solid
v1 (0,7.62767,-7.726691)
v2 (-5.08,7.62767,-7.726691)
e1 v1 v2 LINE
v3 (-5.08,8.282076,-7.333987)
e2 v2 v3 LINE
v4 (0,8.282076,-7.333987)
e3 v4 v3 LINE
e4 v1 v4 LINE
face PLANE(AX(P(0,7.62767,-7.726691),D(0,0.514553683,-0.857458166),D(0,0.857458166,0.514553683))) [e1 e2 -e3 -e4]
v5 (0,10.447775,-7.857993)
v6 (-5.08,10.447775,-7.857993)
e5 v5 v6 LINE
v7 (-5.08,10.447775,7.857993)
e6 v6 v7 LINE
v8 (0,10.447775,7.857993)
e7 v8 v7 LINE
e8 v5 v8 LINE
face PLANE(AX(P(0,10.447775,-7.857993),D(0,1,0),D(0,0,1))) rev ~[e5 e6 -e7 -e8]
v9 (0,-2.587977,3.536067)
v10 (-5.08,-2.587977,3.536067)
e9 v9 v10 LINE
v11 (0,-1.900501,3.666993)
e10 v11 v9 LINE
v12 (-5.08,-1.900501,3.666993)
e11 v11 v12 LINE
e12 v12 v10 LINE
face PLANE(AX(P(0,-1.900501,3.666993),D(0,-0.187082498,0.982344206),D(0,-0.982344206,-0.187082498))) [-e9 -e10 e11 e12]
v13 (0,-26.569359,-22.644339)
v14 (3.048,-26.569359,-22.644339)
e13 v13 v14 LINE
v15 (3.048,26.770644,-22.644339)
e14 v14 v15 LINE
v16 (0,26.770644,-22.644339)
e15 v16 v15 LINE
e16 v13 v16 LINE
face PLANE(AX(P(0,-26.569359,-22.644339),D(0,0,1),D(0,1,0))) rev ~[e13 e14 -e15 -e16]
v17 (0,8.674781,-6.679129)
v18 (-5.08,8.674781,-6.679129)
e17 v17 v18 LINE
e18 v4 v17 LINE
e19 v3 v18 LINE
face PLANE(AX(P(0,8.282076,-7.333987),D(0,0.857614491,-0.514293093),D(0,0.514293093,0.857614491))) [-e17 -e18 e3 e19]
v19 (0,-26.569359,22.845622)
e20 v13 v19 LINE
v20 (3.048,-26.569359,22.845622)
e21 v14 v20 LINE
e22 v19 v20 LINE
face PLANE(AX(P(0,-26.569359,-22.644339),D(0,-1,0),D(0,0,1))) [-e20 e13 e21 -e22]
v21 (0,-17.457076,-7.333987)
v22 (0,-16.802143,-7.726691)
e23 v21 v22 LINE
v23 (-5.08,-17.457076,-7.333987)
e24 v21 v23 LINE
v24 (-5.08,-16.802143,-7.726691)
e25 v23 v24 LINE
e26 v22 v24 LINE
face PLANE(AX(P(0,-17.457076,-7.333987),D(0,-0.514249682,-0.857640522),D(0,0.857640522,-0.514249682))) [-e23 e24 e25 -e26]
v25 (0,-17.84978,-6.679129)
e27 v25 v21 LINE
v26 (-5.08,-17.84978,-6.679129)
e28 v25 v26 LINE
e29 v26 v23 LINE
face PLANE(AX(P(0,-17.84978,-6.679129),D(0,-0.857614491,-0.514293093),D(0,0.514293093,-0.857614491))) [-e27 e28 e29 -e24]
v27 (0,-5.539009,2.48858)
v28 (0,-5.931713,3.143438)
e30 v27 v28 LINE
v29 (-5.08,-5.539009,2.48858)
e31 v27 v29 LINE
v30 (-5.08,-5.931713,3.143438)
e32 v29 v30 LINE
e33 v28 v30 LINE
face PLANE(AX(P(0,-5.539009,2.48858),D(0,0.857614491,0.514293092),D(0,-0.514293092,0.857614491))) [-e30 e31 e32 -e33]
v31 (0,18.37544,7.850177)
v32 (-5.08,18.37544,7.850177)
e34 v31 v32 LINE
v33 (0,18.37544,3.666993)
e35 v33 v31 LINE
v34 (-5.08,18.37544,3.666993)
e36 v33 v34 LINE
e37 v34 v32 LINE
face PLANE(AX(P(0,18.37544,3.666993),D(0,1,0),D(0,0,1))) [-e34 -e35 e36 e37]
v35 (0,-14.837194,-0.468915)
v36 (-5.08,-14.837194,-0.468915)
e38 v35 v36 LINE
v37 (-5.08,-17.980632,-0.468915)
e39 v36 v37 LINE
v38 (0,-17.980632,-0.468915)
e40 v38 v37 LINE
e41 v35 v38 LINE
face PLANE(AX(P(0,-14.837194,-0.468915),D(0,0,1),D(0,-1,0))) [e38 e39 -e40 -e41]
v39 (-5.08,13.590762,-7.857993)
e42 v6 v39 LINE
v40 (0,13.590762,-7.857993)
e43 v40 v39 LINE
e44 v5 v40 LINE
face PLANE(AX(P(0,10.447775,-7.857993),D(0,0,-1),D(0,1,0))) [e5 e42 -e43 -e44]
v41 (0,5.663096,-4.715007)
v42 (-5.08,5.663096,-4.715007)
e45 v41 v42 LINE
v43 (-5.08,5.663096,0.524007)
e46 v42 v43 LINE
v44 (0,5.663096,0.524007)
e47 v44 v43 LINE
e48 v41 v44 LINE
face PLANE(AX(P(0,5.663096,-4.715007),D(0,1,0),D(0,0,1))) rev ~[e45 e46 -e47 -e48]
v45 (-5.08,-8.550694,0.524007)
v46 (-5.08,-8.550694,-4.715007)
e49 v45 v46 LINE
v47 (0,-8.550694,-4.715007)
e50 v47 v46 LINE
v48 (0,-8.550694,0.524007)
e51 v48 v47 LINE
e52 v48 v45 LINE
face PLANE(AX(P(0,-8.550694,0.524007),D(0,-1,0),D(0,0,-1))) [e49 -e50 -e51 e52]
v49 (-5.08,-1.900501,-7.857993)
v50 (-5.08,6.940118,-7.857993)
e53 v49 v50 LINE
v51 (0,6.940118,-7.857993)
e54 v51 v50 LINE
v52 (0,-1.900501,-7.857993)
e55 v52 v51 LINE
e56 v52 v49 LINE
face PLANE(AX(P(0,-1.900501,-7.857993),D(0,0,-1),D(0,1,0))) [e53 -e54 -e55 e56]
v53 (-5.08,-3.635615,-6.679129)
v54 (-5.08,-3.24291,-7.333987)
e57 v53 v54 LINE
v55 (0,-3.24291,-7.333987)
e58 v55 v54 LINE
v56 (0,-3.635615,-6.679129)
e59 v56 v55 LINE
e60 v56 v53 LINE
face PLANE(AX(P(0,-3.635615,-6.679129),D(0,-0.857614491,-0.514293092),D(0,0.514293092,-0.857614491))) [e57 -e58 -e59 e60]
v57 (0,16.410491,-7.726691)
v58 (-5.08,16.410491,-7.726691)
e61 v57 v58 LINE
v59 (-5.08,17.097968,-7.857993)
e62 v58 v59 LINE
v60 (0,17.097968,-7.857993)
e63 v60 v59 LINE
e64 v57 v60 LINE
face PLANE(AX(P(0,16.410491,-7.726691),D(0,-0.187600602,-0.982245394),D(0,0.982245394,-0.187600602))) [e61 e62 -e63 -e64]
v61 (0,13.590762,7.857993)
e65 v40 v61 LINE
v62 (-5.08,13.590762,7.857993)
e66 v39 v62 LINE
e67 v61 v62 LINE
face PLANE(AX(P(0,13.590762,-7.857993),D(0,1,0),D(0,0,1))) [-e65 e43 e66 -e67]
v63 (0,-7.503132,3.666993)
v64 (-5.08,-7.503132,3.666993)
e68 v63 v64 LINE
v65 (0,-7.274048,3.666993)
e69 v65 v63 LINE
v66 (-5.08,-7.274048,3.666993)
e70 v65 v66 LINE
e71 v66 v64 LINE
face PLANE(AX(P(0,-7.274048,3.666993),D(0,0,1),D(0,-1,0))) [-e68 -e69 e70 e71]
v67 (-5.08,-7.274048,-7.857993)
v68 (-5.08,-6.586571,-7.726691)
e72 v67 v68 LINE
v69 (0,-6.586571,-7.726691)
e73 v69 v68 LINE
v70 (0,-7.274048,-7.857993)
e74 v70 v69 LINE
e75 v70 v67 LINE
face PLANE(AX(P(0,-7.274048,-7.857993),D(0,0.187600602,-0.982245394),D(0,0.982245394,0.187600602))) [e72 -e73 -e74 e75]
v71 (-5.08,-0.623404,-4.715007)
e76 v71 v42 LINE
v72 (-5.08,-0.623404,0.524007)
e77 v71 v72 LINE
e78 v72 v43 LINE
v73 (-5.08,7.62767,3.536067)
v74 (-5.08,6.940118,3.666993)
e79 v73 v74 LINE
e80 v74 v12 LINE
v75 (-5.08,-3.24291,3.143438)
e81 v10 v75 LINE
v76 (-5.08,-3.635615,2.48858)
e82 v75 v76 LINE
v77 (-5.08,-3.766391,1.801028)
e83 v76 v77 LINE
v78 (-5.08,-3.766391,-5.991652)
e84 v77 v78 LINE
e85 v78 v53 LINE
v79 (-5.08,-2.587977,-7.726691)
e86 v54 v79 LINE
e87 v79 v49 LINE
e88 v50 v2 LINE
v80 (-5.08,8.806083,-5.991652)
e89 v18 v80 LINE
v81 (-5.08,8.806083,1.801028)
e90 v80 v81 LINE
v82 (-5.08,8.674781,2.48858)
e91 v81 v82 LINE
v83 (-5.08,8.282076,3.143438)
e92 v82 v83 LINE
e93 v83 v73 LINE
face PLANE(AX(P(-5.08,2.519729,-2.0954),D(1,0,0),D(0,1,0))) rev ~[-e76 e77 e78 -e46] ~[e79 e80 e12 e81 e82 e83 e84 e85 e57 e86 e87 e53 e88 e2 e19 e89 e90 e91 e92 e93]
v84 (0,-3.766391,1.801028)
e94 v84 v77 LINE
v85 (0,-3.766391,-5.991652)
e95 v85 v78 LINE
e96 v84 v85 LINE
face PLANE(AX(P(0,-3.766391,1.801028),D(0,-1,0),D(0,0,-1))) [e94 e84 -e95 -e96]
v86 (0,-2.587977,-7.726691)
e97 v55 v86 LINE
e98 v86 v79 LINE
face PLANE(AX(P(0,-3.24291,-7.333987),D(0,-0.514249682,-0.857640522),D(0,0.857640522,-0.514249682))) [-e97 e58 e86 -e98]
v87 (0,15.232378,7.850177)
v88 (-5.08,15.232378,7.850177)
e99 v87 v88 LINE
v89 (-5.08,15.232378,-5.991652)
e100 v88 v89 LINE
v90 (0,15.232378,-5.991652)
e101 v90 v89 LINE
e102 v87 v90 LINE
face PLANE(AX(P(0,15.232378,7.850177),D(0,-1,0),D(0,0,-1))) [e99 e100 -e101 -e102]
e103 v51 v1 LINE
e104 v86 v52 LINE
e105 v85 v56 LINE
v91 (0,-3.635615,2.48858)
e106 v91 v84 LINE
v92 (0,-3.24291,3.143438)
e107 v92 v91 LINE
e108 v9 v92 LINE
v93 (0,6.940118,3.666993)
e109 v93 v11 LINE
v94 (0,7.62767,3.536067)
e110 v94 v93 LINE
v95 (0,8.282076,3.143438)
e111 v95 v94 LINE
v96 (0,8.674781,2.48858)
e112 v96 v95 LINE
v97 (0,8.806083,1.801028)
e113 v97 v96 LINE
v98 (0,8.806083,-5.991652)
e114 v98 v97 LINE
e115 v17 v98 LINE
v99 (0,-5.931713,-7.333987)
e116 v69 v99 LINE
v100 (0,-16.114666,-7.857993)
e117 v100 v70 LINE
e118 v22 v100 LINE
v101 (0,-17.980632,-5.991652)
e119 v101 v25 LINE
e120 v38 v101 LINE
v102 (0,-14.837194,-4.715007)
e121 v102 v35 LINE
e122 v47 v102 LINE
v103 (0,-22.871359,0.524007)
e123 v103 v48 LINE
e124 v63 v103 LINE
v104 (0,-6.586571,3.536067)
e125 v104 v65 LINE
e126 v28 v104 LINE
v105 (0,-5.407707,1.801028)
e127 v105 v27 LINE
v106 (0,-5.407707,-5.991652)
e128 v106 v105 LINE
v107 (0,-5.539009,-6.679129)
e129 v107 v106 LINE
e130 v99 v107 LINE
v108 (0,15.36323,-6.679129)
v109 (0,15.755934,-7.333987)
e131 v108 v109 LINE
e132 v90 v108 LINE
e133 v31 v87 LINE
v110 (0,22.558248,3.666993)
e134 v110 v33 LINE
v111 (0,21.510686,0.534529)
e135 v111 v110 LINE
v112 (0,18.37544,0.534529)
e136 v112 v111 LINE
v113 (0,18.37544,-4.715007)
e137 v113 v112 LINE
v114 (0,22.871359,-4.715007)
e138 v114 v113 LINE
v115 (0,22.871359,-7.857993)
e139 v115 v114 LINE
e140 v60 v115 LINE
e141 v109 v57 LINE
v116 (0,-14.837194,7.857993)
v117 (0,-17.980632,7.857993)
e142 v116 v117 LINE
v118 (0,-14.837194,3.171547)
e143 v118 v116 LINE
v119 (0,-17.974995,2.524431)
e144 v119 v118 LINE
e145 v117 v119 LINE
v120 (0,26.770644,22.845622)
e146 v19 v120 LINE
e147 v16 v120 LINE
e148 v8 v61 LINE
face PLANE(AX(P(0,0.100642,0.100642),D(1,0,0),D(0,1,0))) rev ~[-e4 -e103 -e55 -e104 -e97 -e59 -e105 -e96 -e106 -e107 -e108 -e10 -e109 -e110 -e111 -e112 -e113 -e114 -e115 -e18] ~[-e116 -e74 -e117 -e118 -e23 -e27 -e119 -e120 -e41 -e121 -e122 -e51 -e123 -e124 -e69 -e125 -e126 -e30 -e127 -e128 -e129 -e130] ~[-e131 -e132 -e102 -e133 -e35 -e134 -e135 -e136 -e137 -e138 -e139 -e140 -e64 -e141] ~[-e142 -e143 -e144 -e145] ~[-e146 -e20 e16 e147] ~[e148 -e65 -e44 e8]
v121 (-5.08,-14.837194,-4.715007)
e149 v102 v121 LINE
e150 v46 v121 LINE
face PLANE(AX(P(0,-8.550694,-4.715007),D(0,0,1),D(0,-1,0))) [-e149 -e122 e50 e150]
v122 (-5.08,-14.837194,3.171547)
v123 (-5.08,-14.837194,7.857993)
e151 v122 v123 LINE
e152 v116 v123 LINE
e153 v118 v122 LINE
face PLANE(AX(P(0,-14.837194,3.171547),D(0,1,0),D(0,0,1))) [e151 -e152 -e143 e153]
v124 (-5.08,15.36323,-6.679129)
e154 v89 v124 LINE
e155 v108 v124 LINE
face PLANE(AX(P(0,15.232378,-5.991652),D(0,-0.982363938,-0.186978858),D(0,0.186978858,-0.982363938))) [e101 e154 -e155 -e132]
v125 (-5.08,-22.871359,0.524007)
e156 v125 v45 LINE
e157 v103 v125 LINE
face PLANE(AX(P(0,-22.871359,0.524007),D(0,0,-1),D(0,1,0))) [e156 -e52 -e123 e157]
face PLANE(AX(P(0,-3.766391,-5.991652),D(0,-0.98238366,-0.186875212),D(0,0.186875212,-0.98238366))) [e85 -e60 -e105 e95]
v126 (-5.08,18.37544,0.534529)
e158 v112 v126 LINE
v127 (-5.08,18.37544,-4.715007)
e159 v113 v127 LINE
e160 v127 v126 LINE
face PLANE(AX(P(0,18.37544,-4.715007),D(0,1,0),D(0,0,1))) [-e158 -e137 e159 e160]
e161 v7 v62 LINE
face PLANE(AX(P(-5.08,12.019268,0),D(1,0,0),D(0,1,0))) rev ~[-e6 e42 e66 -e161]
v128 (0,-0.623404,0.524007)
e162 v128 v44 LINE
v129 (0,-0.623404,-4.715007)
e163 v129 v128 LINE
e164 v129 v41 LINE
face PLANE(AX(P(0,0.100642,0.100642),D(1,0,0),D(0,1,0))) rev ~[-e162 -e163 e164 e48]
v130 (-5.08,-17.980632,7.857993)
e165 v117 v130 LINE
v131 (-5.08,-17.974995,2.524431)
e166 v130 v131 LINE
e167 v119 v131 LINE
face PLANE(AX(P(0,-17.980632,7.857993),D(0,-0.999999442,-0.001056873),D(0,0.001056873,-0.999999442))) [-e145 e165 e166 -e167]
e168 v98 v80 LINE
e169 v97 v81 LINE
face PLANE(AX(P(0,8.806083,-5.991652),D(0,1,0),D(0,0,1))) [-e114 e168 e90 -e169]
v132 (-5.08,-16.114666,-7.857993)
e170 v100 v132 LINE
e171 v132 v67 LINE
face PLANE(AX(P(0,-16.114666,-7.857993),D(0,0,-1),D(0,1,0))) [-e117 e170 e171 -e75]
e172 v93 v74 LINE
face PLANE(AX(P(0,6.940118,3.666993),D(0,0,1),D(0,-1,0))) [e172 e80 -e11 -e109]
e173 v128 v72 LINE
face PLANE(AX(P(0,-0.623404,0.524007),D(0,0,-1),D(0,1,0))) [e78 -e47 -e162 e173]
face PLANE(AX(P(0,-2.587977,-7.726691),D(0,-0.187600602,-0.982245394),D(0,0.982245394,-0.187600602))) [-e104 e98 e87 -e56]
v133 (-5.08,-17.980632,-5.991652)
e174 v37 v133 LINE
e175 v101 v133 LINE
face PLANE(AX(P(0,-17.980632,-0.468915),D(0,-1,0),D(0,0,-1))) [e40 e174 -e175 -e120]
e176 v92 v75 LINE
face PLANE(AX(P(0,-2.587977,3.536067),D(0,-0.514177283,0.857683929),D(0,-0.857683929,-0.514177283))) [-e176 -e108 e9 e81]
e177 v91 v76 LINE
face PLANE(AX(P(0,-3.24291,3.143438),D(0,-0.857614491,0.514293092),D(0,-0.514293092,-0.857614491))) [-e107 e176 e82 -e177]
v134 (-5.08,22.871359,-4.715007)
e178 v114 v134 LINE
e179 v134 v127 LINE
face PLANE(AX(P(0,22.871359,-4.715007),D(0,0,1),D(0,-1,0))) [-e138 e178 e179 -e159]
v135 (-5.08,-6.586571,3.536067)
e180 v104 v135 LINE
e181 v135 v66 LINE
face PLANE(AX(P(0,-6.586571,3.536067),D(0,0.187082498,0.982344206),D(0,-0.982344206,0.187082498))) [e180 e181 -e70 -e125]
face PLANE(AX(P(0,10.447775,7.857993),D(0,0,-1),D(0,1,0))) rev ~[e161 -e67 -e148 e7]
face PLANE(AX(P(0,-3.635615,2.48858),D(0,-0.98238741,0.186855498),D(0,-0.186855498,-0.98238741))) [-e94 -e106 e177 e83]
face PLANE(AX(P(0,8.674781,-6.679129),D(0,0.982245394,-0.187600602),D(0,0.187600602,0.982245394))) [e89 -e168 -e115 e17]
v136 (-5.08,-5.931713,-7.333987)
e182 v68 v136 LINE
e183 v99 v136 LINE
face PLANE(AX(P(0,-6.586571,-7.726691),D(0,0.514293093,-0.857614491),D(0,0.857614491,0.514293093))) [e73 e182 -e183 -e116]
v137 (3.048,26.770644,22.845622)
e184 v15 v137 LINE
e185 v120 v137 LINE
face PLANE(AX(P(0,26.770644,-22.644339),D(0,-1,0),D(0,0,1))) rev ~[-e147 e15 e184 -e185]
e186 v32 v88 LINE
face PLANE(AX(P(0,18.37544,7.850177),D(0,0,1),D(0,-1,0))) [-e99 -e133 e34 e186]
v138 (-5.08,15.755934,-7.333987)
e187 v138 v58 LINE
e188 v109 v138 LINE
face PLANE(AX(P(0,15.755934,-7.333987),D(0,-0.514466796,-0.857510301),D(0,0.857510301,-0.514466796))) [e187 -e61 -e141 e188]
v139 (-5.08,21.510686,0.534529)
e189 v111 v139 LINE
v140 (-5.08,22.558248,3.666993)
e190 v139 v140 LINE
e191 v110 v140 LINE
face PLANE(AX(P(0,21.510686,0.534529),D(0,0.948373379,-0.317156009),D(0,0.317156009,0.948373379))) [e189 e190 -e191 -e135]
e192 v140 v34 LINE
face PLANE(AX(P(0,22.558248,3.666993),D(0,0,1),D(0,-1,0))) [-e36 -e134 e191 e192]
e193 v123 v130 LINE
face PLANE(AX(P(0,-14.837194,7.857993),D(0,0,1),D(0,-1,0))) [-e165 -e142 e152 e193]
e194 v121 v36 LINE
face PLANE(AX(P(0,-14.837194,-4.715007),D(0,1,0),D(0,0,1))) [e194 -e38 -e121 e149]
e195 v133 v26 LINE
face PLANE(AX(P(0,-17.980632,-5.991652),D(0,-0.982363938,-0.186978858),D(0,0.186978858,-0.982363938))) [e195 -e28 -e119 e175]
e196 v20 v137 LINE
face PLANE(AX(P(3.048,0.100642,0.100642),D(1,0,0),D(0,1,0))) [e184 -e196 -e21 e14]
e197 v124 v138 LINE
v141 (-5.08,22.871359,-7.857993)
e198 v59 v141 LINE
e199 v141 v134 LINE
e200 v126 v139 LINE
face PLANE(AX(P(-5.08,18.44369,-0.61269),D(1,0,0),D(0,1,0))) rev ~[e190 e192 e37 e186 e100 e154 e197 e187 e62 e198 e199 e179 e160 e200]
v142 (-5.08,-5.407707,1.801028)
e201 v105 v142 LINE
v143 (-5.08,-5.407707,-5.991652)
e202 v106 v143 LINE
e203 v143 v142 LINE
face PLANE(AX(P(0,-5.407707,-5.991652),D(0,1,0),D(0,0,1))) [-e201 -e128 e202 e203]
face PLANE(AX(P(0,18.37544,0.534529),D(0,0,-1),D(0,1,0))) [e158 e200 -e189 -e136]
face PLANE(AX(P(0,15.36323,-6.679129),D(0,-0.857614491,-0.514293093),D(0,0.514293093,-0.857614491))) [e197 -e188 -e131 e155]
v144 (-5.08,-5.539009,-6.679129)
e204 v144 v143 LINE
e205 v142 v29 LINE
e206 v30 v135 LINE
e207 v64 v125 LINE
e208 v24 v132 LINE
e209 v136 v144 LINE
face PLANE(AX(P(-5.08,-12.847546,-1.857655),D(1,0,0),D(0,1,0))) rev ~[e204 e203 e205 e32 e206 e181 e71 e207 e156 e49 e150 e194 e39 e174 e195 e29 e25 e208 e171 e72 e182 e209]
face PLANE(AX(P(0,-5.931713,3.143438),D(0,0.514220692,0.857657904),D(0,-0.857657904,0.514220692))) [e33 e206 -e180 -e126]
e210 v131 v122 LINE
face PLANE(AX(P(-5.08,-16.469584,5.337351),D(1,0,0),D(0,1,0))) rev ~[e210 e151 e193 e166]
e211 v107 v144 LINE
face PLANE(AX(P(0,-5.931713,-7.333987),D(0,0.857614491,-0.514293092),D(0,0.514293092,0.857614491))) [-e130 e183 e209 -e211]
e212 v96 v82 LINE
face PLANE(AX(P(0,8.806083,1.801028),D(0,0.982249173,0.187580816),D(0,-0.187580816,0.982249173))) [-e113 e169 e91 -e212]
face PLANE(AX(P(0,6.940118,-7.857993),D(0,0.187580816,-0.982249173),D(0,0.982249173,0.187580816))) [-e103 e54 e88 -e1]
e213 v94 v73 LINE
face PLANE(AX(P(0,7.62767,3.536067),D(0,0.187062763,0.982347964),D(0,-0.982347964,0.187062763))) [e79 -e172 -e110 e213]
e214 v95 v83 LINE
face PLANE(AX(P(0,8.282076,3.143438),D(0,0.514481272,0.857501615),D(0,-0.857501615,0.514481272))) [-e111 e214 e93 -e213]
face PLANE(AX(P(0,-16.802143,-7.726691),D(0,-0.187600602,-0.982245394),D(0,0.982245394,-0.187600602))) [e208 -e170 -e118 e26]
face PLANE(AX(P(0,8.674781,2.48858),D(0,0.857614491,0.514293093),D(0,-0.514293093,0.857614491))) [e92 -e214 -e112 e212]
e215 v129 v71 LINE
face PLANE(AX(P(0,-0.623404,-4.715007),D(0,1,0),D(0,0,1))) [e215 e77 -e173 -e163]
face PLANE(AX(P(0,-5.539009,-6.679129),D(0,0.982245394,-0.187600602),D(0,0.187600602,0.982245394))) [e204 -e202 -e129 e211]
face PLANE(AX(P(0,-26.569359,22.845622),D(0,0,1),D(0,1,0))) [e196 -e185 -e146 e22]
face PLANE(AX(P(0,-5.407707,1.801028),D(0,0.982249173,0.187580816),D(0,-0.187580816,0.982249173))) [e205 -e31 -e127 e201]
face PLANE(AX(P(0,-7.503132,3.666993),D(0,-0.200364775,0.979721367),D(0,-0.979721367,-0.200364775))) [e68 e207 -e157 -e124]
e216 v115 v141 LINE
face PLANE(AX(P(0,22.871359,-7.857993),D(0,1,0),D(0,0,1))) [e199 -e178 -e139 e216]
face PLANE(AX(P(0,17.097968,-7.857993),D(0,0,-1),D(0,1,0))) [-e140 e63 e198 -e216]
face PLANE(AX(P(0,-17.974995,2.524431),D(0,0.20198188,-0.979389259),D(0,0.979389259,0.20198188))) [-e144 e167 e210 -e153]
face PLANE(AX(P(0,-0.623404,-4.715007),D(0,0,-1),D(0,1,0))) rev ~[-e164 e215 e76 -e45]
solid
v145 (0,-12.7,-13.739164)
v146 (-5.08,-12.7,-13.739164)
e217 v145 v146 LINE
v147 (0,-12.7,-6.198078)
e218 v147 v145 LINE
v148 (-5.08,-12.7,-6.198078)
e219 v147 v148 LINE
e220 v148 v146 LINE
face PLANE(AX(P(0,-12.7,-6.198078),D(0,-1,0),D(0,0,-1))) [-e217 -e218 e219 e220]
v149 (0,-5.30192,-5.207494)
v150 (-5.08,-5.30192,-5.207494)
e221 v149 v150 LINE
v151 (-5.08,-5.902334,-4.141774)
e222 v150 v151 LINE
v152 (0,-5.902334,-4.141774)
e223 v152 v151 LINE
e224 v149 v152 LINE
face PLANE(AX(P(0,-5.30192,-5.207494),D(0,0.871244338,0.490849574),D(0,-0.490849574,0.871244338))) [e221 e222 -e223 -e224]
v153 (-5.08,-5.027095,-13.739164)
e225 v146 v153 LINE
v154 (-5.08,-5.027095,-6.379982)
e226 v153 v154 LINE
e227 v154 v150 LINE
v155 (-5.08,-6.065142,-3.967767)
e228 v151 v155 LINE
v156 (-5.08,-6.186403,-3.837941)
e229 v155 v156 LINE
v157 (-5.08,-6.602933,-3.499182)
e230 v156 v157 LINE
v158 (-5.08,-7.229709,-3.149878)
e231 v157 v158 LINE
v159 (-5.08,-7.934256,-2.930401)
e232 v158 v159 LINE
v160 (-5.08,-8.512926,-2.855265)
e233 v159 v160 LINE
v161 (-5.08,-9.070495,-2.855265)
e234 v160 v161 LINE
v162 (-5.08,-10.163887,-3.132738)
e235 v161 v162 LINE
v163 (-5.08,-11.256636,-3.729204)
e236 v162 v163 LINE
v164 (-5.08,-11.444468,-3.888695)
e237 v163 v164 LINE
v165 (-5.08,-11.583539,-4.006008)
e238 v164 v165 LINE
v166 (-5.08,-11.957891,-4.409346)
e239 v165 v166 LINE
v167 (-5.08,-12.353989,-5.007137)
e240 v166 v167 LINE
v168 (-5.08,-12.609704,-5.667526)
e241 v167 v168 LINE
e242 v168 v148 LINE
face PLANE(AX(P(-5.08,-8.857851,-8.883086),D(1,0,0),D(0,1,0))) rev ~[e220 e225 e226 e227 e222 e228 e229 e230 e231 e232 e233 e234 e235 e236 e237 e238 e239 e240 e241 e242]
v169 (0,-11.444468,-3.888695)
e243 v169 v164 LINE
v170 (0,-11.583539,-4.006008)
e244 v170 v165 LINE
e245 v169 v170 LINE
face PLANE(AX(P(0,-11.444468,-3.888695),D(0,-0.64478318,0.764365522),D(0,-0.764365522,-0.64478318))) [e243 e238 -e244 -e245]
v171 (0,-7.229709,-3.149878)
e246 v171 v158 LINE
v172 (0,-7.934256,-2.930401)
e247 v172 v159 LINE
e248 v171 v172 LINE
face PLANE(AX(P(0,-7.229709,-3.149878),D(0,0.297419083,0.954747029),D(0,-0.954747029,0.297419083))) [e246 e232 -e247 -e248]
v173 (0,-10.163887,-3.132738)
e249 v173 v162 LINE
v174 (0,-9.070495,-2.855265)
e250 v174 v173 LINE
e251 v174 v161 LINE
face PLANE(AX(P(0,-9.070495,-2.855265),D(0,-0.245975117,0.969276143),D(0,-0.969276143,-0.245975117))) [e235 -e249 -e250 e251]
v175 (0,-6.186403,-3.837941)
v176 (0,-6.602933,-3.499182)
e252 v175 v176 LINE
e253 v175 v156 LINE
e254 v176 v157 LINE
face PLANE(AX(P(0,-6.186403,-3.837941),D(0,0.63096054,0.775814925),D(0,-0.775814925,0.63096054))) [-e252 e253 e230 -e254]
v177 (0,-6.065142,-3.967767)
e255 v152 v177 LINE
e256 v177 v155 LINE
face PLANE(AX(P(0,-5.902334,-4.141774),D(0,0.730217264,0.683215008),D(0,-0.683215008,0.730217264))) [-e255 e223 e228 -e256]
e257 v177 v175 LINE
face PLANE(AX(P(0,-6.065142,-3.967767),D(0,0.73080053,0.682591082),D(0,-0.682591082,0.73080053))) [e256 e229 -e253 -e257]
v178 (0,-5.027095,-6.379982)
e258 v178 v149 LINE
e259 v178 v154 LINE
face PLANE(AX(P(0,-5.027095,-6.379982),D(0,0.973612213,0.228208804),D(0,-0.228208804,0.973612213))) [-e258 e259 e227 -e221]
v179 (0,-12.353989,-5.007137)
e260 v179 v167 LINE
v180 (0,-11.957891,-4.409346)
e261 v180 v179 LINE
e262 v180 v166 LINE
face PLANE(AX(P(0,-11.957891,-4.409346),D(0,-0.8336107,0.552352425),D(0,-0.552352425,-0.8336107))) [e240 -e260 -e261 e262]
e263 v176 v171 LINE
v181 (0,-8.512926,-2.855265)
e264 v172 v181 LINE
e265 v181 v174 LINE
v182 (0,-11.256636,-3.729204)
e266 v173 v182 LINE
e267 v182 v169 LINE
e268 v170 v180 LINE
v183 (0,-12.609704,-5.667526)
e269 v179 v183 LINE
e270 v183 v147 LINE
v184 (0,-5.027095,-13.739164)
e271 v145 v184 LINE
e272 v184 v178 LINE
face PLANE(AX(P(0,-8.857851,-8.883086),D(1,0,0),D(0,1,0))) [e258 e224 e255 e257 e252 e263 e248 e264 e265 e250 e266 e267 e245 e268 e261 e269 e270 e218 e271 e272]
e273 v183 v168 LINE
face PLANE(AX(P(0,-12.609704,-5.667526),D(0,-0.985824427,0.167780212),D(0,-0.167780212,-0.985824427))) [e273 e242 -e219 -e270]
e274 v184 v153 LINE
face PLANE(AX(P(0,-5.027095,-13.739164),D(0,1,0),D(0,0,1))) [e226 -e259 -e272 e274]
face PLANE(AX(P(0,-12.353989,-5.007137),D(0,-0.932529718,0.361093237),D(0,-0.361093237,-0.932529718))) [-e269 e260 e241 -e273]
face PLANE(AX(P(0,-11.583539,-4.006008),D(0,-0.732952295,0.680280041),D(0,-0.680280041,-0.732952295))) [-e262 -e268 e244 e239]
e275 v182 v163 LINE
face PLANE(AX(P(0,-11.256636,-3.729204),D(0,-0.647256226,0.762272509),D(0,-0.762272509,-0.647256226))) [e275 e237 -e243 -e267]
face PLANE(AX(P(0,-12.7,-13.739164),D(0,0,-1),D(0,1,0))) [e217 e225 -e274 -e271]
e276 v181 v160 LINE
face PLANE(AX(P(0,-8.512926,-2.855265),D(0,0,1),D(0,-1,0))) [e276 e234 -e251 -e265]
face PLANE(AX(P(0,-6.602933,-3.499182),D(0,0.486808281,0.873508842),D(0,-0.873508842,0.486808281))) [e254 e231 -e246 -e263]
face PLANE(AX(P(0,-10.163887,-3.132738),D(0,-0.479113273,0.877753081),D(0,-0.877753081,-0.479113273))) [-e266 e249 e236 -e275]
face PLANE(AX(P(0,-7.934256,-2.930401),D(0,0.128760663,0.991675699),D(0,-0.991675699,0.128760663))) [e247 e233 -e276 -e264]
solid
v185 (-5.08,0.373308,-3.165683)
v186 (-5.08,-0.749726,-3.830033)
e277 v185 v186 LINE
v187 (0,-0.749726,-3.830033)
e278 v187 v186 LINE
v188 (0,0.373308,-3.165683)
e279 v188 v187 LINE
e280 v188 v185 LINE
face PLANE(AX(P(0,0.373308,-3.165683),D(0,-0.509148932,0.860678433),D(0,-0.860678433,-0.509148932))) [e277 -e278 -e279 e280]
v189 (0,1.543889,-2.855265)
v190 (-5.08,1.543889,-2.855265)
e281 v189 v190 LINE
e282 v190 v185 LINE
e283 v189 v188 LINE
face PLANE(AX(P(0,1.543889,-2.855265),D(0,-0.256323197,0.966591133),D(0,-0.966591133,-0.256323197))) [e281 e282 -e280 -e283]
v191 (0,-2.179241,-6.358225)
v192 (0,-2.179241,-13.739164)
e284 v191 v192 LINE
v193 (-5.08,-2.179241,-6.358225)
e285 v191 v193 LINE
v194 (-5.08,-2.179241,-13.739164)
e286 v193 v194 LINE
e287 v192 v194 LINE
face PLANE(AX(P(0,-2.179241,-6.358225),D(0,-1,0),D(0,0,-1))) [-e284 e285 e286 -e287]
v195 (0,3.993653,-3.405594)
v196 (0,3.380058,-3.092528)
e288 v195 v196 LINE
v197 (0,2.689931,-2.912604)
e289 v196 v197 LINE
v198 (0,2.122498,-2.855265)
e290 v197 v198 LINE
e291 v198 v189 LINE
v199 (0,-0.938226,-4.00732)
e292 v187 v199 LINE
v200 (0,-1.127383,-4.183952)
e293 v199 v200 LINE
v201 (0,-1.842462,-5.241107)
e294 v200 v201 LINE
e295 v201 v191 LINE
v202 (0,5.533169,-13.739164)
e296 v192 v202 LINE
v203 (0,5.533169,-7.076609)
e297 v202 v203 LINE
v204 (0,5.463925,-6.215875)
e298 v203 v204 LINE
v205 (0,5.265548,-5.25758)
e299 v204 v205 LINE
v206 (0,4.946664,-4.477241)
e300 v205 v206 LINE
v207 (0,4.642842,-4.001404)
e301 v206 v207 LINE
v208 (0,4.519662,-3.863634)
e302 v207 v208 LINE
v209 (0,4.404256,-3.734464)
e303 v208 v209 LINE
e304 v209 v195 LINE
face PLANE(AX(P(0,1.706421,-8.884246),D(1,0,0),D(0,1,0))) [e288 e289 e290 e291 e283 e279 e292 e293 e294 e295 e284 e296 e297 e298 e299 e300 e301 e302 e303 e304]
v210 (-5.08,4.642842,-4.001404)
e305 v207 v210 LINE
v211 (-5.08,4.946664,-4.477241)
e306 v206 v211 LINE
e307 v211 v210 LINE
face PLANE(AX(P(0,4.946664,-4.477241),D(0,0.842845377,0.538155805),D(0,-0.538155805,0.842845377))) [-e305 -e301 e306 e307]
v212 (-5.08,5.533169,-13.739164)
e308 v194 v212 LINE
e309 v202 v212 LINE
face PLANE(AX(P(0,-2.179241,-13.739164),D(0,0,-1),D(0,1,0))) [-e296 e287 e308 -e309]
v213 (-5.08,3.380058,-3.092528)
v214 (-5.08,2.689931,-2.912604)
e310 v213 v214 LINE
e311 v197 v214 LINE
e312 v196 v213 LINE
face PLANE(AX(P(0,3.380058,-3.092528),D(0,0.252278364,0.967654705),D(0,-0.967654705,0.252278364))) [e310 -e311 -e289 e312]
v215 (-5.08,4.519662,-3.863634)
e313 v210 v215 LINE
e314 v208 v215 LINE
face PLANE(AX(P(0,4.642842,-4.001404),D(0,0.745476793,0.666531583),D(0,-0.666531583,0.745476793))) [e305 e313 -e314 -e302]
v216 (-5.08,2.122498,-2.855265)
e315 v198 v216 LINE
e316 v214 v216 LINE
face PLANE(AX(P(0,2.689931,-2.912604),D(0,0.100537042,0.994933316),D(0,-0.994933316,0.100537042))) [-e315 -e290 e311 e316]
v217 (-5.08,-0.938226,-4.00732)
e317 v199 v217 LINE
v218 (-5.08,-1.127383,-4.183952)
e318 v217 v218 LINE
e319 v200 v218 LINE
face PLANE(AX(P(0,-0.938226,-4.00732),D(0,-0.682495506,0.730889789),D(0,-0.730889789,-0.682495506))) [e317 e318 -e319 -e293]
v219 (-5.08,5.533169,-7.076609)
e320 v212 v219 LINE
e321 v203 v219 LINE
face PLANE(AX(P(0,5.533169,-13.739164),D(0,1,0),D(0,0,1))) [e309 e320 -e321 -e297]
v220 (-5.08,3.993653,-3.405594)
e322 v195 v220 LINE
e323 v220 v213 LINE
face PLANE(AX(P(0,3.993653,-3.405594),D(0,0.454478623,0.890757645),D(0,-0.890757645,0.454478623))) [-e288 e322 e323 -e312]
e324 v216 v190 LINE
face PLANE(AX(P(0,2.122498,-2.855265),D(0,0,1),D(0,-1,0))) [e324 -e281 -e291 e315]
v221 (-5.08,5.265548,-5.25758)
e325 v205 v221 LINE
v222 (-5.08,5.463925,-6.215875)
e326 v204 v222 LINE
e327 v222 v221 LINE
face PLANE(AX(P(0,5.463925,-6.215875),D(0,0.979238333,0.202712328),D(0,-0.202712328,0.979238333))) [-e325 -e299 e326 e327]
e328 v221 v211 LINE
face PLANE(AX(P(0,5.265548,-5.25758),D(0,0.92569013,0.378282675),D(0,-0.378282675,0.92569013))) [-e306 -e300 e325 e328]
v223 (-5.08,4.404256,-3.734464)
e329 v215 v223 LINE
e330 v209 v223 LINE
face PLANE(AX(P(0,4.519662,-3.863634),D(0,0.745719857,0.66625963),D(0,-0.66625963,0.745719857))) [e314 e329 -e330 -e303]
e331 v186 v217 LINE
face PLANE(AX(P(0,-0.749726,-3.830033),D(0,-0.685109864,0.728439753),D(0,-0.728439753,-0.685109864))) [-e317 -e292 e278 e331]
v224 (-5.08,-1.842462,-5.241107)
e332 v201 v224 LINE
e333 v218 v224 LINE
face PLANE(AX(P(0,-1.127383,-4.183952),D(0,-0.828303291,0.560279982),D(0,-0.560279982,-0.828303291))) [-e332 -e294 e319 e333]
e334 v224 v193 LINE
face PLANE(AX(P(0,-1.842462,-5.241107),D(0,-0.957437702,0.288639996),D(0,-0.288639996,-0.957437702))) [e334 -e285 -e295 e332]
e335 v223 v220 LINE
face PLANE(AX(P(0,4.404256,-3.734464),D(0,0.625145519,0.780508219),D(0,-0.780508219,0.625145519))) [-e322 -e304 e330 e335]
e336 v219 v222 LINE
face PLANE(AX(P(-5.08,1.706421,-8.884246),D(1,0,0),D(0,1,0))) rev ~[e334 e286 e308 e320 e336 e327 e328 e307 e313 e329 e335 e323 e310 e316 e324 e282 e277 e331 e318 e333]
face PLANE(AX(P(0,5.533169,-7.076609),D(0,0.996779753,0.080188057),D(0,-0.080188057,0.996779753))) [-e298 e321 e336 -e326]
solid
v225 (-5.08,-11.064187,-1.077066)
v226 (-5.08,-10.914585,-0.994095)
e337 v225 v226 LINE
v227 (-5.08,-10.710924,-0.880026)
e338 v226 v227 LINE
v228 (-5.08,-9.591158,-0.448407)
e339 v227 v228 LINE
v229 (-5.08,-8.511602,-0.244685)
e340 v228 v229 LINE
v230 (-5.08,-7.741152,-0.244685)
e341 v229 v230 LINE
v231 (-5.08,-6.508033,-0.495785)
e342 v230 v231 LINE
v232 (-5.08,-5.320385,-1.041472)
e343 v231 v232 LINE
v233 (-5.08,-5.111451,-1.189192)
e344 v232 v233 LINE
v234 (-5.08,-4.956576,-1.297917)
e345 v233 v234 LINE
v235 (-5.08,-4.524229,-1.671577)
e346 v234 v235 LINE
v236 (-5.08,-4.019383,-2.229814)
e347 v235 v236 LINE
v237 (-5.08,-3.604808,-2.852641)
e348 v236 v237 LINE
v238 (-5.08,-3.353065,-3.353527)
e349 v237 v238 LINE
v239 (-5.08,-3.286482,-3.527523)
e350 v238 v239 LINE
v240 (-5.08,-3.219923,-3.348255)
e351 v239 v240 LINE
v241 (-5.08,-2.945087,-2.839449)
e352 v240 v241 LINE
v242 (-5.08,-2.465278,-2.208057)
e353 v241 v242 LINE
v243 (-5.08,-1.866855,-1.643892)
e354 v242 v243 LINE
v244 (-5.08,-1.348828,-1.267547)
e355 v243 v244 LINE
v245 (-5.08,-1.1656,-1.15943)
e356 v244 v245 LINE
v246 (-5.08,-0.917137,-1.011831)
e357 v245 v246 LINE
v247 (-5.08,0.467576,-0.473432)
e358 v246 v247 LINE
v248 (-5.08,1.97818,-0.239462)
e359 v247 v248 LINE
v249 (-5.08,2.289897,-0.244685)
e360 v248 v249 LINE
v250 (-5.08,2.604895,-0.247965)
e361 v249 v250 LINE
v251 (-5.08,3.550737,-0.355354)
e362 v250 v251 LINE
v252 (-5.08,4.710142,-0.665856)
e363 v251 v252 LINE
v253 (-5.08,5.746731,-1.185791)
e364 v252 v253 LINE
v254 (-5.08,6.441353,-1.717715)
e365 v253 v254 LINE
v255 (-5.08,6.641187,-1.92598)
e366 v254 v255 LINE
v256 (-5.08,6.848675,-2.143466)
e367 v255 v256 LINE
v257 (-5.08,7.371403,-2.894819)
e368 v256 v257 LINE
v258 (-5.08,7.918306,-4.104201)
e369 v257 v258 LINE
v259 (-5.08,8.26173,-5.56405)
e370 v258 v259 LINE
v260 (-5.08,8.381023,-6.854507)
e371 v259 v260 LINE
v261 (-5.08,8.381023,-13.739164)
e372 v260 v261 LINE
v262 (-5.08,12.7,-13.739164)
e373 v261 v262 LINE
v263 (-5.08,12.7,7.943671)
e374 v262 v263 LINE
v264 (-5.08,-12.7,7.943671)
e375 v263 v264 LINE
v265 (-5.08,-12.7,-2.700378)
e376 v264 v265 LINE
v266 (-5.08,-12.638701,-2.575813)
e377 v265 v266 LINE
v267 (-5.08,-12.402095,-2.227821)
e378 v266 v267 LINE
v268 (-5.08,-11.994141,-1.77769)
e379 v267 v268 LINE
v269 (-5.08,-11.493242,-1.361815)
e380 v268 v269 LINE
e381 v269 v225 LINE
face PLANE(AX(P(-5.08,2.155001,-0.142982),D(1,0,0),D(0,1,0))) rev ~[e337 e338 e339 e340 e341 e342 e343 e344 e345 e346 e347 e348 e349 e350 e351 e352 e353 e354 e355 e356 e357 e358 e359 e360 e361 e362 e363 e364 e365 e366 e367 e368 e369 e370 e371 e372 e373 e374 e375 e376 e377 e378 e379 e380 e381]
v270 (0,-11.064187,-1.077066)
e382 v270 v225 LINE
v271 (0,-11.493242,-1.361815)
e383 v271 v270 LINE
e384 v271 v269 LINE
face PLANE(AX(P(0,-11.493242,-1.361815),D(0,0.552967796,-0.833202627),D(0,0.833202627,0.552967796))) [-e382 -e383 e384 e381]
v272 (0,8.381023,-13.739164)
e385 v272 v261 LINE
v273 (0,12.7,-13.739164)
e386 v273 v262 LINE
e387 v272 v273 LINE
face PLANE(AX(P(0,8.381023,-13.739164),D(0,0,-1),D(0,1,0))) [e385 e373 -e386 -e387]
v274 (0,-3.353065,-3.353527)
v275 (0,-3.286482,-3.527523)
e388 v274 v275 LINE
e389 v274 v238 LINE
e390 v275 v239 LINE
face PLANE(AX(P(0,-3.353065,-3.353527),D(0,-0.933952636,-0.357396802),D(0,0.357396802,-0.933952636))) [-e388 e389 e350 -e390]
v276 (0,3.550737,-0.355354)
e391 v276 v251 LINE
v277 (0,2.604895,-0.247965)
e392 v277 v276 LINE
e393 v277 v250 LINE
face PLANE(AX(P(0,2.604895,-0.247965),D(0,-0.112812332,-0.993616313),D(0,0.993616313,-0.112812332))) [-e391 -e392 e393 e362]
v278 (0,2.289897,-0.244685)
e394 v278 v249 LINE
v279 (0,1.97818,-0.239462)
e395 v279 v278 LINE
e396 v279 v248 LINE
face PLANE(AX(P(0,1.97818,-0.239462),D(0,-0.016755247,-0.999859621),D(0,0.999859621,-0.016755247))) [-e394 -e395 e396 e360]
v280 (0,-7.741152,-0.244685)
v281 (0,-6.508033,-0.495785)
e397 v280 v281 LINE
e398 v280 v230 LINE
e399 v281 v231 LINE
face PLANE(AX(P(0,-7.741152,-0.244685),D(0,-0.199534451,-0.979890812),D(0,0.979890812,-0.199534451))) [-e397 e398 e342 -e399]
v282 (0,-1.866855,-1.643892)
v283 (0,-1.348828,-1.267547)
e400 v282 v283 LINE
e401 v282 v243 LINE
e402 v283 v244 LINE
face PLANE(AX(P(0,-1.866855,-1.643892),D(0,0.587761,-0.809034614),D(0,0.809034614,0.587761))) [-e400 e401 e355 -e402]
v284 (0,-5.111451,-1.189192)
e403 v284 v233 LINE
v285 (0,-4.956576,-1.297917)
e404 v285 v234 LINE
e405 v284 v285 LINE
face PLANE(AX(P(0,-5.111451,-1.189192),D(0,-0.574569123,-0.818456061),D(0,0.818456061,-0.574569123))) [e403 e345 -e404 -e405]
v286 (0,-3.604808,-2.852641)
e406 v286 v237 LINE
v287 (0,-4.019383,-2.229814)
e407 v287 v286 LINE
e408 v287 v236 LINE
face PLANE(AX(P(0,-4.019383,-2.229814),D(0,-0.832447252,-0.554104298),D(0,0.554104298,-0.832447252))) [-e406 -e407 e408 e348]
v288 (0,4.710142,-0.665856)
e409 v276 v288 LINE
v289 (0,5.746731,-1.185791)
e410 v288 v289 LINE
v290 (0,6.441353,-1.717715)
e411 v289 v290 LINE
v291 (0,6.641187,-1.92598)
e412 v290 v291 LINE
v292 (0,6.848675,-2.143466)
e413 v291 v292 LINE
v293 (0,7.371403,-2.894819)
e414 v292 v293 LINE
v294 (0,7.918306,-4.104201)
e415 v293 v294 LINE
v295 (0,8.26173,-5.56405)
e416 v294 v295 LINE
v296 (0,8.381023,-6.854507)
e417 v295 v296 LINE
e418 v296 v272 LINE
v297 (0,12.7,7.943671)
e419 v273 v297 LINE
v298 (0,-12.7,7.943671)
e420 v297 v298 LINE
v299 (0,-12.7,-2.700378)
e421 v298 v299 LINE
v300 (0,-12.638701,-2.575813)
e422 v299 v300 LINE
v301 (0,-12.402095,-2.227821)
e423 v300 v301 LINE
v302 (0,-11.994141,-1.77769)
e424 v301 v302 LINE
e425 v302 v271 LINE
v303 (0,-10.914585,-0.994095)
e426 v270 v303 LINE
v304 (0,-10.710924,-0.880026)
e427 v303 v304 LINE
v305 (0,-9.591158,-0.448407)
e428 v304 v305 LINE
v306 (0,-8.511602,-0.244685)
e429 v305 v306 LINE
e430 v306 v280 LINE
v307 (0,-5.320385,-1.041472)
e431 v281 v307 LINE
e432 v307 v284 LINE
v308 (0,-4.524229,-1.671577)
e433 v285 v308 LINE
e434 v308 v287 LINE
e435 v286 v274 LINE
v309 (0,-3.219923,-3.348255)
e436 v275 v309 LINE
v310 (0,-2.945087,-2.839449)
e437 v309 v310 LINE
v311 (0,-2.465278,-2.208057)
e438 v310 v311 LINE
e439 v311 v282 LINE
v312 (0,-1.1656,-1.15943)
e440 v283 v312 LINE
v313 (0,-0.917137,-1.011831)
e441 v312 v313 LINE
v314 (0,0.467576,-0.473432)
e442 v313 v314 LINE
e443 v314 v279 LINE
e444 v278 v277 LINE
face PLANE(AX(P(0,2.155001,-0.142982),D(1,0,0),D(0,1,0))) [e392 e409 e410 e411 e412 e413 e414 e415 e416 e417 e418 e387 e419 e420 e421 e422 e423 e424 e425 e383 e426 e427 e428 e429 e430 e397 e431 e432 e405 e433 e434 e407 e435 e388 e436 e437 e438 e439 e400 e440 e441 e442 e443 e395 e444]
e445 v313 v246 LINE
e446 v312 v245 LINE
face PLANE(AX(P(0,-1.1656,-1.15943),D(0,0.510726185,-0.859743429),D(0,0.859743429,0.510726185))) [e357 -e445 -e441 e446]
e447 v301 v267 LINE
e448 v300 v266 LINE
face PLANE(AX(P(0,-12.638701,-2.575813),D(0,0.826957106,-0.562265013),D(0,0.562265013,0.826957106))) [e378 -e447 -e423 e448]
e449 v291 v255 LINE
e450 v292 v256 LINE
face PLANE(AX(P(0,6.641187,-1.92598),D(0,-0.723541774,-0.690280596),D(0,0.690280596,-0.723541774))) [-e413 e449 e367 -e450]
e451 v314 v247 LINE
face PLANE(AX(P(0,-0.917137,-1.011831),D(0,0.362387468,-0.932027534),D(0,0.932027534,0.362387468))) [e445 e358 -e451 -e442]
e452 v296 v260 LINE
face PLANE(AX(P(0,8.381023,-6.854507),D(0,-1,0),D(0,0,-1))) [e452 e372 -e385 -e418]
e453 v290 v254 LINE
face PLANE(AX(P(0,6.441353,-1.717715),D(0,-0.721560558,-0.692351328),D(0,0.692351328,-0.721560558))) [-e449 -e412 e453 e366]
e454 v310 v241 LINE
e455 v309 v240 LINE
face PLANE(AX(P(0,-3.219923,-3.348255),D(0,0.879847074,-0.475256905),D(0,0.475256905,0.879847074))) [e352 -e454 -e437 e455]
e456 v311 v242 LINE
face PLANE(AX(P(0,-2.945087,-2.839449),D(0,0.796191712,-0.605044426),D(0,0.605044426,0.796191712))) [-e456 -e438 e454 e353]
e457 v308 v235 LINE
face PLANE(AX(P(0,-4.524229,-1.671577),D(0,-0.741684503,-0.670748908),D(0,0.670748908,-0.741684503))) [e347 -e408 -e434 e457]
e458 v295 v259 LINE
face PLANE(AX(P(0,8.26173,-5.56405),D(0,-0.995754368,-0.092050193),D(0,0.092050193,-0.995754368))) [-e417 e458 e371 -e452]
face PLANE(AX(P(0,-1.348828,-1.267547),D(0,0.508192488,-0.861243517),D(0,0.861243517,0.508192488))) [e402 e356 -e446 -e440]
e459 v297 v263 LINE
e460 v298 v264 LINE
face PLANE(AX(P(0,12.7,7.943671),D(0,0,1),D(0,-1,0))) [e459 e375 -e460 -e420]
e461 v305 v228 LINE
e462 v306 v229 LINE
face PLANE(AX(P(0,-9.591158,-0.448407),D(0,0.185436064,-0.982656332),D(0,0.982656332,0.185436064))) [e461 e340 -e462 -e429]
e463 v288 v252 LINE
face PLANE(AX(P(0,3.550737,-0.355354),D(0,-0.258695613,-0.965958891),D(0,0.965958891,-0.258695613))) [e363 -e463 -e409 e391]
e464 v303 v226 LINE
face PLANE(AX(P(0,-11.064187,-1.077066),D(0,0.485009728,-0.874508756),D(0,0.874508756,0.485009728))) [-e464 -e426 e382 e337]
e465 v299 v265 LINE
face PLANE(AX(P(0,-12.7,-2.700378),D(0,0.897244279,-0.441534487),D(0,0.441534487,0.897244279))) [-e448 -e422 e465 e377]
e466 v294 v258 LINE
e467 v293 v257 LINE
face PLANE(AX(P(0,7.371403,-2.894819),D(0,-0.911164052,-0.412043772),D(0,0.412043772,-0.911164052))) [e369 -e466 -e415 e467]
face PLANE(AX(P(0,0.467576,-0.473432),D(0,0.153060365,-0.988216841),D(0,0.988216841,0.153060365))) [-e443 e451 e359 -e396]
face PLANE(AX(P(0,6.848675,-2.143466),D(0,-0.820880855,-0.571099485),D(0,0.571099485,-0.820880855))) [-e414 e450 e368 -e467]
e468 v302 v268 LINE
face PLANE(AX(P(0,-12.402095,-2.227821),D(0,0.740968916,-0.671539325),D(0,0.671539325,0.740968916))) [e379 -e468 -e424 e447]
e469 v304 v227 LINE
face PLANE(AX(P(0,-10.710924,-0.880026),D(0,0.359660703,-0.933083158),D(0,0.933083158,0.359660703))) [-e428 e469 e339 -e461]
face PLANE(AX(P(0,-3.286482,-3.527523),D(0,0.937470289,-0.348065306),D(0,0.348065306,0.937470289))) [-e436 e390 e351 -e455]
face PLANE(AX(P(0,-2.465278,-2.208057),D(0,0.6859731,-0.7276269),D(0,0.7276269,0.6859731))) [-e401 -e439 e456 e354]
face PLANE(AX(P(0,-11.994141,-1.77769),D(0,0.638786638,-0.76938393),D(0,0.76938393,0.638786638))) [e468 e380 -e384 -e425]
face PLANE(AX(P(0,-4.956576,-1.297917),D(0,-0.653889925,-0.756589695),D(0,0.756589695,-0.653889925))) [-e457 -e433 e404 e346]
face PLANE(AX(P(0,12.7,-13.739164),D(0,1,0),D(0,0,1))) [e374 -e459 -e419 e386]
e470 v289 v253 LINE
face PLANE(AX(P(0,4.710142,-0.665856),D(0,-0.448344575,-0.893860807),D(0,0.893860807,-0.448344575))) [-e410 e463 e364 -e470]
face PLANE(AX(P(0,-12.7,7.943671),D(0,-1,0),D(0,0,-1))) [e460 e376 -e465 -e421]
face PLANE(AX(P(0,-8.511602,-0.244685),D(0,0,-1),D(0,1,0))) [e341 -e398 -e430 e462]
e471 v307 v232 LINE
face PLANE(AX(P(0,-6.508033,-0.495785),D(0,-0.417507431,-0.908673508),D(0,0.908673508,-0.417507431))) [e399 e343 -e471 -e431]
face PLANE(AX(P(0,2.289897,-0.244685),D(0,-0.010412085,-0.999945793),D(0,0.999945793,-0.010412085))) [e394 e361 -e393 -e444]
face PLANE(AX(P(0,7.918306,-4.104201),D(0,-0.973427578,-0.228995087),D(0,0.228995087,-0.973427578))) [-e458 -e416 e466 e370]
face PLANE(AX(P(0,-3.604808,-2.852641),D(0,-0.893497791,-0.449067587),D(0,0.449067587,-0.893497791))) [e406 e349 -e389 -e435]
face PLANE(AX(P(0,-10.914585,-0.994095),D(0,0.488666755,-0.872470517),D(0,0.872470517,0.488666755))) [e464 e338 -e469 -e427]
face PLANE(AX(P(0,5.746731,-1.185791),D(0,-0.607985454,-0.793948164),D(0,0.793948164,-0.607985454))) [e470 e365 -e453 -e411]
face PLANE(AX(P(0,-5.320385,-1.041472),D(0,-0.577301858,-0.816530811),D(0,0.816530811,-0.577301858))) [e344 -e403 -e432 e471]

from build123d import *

# Parameters (mm, degrees)
F1_DEPTH = 5.08
F2_W     = 53.3400028944
F2_H     = 45.4899612814
F3_DEPTH = 3.048
F4_W     = 3.1429869445
F4_H     = 15.7159869445
F4_W_2   = 6.2865
F4_H_2   = 5.2390130555
F5_DEPTH = 5.08


with BuildPart() as f1:
    # F0 (on Right) → F1 (new body)
    with BuildSketch(Plane.YZ):
        Polygon((12.7, 7.9436706283), (-12.7, 7.9436706283), (-12.7, -2.7003783846), (-12.6387012167, -2.5758128428), (-12.4020947161, -2.2278213751), (-11.9941407446, -1.7776895645), (-11.4932424625, -1.3618151002), (-11.0641874235, -1.077066095), (-10.9145848638, -0.9940952884), (-10.7109237259, -0.8800256144), (-9.5911579813, -0.4484073484), (-8.5116021006, -0.2446854706), (-8.1517541896, -0.2446854706), (-7.7411519552, -0.2446854706), (-6.5080332683, -0.4957845293), (-5.3203845271, -1.0414724693), (-5.1114511593, -1.1891920898), (-4.9565763698, -1.297916646), (-4.5242292241, -1.6715768273), (-4.0193828436, -2.2298136463), (-3.6048082147, -2.8526413552), (-3.3530653122, -3.3535274892), (-3.2864821511, -3.5275232231), (-3.2199232859, -3.3482552594), (-2.9450870447, -2.8394486325), (-2.4652776821, -2.208056587), (-1.8668552954, -1.6438915465), (-1.3488283402, -1.2675466582), (-1.1656001301, -1.1594295018), (-0.9171371863, -1.0118313613), (0.4675763315, -0.4734322183), (1.9781795225, -0.2394618327), (2.2898970768, -0.2446854706), (2.6048945898, -0.2479654292), (3.5507374885, -0.3553537059), (4.7101421411, -0.6658564608), (5.7467305632, -1.1857906512), (6.4413529232, -1.7177149127), (6.6411874426, -1.9259801407), (6.848675199, -2.1434656971), (7.3714034282, -2.8948191942), (7.9183061677, -4.1042006986), (8.2617299893, -5.5640495661), (8.3810233012, -6.8545067898), (8.3810233012, -7.2848859603), (8.3810233012, -13.7391643503), (12.7, -13.7391643503), align=None)
    extrude(amount=-F1_DEPTH)


with BuildPart() as f1b:
    # F0 (on Right) → F1, piece 2 (new body)
    with BuildSketch(Plane.YZ):
        Polygon((-5.0270954813, -13.7391643503), (-5.0270954813, -6.7708071036), (-5.0270954813, -6.3799818051), (-5.3019195745, -5.2074937618), (-5.9023342325, -4.1417744475), (-6.0651416628, -3.9677665656), (-6.18640295, -3.8379409419), (-6.602933406, -3.4991819505), (-7.2297092133, -3.1498784993), (-7.9342564853, -2.9304006718), (-8.512926232, -2.8552653221), (-8.7053626224, -2.8552653221), (-9.0704949112, -2.8552653221), (-10.1638873584, -3.1327376782), (-11.2566359619, -3.7292042378), (-11.4444682622, -3.8886952655), (-11.5835385101, -4.0060084542), (-11.9578911272, -4.4093461876), (-12.3539886555, -5.0071368786), (-12.6097039524, -5.6675261883), (-12.7, -6.1980777265), (-12.7, -6.375365567), (-12.7, -13.7391643503), align=None)
    extrude(amount=-F1_DEPTH)


with BuildPart() as f1c:
    # F0 (on Right) → F1, piece 3 (new body)
    with BuildSketch(Plane.YZ):
        Polygon((2.1224977043, -2.8552653221), (1.9339608203, -2.8552653221), (1.5438886976, -2.8552653221), (0.3733078895, -3.165683041), (-0.7497256657, -3.8300325971), (-0.9382261058, -4.0073204377), (-1.1273825375, -4.1839522864), (-1.8424621212, -5.2411072643), (-2.1792409894, -6.3582247459), (-2.1792409894, -6.7312532315), (-2.1792409894, -13.7391643503), (5.5331688093, -13.7391643503), (5.5331688093, -7.3639694084), (5.5331688093, -7.0766085843), (5.4639252372, -6.2158745393), (5.2655484772, -5.2575799456), (4.9466636058, -4.4772413322), (4.6428422482, -4.001404364), (4.5196615779, -3.8636339516), (4.4042556244, -3.7344643197), (3.99365339, -3.4055937962), (3.3800581573, -3.0925278145), (2.6899305556, -2.912603859), align=None)
    extrude(amount=-F1_DEPTH)


with BuildPart() as f3:
    # F2 (on Right) → F3 (new body)
    with BuildSketch(Plane.YZ):
        with Locations((0.1006424427, 0.1006415114)):
            Rectangle(F2_W, F2_H)
    extrude(amount=F3_DEPTH)

    # F4 (on Right) → F5 (join)
    with BuildSketch(Plane.YZ):
        Polygon((22.8713592142, -4.7150065277), (18.3754403267, -4.7150065277), (18.3754403267, 0.5345287472), (21.5106859241, 0.5345287472), (22.5582480273, 3.6669934723), (18.3754403267, 3.6669934723), (18.3754403267, 7.8501769664), (15.2323782235, 7.8501769664), (15.2323782235, -5.7624934723), (15.2323782235, -5.9916523798), (15.363229538, -6.6791291023), (15.755933799, -7.3339869445), (16.4104910064, -7.7266912055), (17.0979677289, -7.8579934723), (17.32750243, -7.8579934723), (22.8713592142, -7.8579934723), align=None)
        with Locations((12.0192682024, 0)):
            Rectangle(F4_W, F4_H)
        Polygon((6.9401177235, 3.6669934723), (6.7110339747, 3.6669934723), (-1.6709660253, 3.6669934723), (-1.9005007263, 3.6669934723), (-2.5879774488, 3.536066999), (-3.2429104498, 3.1434378968), (-3.6356147107, 2.4885800545), (-3.7663908665, 1.8010281733), (-3.7663908665, 1.5714934723), (-3.7663908665, -5.7624934723), (-3.7663908665, -5.9916523798), (-3.6356147107, -6.6791291023), (-3.2429104498, -7.3339869445), (-2.5879774488, -7.7266912055), (-1.9005007263, -7.8579934723), (-1.6709660253, -7.8579934723), (6.7110339747, -7.8579934723), (6.9401177235, -7.8579934723), (7.6276696047, -7.7266912055), (8.2820764947, -7.3339869445), (8.6747807557, -6.6791291023), (8.8060830225, -5.9916523798), (8.8060830225, -5.7624934723), (8.8060830225, 1.5714934723), (8.8060830225, 1.8010281733), (8.6747807557, 2.4885800545), (8.2820764947, 3.1434378968), (7.6276696047, 3.536066999), align=None)
        with Locations((2.519846078, -2.0955)):
            Rectangle(F4_W_2, F4_H_2, mode=Mode.SUBTRACT)
        Polygon((-17.9749947186, 2.5244307593), (-14.8371937251, 3.1715472544), (-14.8371937251, 7.8579934723), (-17.9806316219, 7.8579934723), align=None)
        Polygon((-7.2740478731, 3.6669934723), (-7.5031316219, 3.6669934723), (-22.8713592142, 0.5240065277), (-8.5506937251, 0.5240065277), (-8.5506937251, -4.7150065277), (-14.8371937251, -4.7150065277), (-14.8371937251, -0.4689151931), (-17.9806316219, -0.4689151931), (-17.9806316219, -5.7624934723), (-17.9806316219, -5.9916523798), (-17.8497803074, -6.6791291023), (-17.4570760464, -7.3339869445), (-16.8021430454, -7.7266912055), (-16.1146663229, -7.8579934723), (-15.8851316219, -7.8579934723), (-7.5031316219, -7.8579934723), (-7.2740478731, -7.8579934723), (-6.5865711506, -7.7266912055), (-5.9317133083, -7.3339869445), (-5.5390090474, -6.6791291023), (-5.4077067806, -5.9916523798), (-5.4077067806, -5.7624934723), (-5.4077067806, 1.5714934723), (-5.4077067806, 1.8010281733), (-5.5390090474, 2.4885800545), (-5.9317133083, 3.1434378968), (-6.5865711506, 3.536066999), align=None)
    extrude(amount=-F5_DEPTH)


solid = Compound([f1.part, f1b.part, f1c.part, f3.part])
